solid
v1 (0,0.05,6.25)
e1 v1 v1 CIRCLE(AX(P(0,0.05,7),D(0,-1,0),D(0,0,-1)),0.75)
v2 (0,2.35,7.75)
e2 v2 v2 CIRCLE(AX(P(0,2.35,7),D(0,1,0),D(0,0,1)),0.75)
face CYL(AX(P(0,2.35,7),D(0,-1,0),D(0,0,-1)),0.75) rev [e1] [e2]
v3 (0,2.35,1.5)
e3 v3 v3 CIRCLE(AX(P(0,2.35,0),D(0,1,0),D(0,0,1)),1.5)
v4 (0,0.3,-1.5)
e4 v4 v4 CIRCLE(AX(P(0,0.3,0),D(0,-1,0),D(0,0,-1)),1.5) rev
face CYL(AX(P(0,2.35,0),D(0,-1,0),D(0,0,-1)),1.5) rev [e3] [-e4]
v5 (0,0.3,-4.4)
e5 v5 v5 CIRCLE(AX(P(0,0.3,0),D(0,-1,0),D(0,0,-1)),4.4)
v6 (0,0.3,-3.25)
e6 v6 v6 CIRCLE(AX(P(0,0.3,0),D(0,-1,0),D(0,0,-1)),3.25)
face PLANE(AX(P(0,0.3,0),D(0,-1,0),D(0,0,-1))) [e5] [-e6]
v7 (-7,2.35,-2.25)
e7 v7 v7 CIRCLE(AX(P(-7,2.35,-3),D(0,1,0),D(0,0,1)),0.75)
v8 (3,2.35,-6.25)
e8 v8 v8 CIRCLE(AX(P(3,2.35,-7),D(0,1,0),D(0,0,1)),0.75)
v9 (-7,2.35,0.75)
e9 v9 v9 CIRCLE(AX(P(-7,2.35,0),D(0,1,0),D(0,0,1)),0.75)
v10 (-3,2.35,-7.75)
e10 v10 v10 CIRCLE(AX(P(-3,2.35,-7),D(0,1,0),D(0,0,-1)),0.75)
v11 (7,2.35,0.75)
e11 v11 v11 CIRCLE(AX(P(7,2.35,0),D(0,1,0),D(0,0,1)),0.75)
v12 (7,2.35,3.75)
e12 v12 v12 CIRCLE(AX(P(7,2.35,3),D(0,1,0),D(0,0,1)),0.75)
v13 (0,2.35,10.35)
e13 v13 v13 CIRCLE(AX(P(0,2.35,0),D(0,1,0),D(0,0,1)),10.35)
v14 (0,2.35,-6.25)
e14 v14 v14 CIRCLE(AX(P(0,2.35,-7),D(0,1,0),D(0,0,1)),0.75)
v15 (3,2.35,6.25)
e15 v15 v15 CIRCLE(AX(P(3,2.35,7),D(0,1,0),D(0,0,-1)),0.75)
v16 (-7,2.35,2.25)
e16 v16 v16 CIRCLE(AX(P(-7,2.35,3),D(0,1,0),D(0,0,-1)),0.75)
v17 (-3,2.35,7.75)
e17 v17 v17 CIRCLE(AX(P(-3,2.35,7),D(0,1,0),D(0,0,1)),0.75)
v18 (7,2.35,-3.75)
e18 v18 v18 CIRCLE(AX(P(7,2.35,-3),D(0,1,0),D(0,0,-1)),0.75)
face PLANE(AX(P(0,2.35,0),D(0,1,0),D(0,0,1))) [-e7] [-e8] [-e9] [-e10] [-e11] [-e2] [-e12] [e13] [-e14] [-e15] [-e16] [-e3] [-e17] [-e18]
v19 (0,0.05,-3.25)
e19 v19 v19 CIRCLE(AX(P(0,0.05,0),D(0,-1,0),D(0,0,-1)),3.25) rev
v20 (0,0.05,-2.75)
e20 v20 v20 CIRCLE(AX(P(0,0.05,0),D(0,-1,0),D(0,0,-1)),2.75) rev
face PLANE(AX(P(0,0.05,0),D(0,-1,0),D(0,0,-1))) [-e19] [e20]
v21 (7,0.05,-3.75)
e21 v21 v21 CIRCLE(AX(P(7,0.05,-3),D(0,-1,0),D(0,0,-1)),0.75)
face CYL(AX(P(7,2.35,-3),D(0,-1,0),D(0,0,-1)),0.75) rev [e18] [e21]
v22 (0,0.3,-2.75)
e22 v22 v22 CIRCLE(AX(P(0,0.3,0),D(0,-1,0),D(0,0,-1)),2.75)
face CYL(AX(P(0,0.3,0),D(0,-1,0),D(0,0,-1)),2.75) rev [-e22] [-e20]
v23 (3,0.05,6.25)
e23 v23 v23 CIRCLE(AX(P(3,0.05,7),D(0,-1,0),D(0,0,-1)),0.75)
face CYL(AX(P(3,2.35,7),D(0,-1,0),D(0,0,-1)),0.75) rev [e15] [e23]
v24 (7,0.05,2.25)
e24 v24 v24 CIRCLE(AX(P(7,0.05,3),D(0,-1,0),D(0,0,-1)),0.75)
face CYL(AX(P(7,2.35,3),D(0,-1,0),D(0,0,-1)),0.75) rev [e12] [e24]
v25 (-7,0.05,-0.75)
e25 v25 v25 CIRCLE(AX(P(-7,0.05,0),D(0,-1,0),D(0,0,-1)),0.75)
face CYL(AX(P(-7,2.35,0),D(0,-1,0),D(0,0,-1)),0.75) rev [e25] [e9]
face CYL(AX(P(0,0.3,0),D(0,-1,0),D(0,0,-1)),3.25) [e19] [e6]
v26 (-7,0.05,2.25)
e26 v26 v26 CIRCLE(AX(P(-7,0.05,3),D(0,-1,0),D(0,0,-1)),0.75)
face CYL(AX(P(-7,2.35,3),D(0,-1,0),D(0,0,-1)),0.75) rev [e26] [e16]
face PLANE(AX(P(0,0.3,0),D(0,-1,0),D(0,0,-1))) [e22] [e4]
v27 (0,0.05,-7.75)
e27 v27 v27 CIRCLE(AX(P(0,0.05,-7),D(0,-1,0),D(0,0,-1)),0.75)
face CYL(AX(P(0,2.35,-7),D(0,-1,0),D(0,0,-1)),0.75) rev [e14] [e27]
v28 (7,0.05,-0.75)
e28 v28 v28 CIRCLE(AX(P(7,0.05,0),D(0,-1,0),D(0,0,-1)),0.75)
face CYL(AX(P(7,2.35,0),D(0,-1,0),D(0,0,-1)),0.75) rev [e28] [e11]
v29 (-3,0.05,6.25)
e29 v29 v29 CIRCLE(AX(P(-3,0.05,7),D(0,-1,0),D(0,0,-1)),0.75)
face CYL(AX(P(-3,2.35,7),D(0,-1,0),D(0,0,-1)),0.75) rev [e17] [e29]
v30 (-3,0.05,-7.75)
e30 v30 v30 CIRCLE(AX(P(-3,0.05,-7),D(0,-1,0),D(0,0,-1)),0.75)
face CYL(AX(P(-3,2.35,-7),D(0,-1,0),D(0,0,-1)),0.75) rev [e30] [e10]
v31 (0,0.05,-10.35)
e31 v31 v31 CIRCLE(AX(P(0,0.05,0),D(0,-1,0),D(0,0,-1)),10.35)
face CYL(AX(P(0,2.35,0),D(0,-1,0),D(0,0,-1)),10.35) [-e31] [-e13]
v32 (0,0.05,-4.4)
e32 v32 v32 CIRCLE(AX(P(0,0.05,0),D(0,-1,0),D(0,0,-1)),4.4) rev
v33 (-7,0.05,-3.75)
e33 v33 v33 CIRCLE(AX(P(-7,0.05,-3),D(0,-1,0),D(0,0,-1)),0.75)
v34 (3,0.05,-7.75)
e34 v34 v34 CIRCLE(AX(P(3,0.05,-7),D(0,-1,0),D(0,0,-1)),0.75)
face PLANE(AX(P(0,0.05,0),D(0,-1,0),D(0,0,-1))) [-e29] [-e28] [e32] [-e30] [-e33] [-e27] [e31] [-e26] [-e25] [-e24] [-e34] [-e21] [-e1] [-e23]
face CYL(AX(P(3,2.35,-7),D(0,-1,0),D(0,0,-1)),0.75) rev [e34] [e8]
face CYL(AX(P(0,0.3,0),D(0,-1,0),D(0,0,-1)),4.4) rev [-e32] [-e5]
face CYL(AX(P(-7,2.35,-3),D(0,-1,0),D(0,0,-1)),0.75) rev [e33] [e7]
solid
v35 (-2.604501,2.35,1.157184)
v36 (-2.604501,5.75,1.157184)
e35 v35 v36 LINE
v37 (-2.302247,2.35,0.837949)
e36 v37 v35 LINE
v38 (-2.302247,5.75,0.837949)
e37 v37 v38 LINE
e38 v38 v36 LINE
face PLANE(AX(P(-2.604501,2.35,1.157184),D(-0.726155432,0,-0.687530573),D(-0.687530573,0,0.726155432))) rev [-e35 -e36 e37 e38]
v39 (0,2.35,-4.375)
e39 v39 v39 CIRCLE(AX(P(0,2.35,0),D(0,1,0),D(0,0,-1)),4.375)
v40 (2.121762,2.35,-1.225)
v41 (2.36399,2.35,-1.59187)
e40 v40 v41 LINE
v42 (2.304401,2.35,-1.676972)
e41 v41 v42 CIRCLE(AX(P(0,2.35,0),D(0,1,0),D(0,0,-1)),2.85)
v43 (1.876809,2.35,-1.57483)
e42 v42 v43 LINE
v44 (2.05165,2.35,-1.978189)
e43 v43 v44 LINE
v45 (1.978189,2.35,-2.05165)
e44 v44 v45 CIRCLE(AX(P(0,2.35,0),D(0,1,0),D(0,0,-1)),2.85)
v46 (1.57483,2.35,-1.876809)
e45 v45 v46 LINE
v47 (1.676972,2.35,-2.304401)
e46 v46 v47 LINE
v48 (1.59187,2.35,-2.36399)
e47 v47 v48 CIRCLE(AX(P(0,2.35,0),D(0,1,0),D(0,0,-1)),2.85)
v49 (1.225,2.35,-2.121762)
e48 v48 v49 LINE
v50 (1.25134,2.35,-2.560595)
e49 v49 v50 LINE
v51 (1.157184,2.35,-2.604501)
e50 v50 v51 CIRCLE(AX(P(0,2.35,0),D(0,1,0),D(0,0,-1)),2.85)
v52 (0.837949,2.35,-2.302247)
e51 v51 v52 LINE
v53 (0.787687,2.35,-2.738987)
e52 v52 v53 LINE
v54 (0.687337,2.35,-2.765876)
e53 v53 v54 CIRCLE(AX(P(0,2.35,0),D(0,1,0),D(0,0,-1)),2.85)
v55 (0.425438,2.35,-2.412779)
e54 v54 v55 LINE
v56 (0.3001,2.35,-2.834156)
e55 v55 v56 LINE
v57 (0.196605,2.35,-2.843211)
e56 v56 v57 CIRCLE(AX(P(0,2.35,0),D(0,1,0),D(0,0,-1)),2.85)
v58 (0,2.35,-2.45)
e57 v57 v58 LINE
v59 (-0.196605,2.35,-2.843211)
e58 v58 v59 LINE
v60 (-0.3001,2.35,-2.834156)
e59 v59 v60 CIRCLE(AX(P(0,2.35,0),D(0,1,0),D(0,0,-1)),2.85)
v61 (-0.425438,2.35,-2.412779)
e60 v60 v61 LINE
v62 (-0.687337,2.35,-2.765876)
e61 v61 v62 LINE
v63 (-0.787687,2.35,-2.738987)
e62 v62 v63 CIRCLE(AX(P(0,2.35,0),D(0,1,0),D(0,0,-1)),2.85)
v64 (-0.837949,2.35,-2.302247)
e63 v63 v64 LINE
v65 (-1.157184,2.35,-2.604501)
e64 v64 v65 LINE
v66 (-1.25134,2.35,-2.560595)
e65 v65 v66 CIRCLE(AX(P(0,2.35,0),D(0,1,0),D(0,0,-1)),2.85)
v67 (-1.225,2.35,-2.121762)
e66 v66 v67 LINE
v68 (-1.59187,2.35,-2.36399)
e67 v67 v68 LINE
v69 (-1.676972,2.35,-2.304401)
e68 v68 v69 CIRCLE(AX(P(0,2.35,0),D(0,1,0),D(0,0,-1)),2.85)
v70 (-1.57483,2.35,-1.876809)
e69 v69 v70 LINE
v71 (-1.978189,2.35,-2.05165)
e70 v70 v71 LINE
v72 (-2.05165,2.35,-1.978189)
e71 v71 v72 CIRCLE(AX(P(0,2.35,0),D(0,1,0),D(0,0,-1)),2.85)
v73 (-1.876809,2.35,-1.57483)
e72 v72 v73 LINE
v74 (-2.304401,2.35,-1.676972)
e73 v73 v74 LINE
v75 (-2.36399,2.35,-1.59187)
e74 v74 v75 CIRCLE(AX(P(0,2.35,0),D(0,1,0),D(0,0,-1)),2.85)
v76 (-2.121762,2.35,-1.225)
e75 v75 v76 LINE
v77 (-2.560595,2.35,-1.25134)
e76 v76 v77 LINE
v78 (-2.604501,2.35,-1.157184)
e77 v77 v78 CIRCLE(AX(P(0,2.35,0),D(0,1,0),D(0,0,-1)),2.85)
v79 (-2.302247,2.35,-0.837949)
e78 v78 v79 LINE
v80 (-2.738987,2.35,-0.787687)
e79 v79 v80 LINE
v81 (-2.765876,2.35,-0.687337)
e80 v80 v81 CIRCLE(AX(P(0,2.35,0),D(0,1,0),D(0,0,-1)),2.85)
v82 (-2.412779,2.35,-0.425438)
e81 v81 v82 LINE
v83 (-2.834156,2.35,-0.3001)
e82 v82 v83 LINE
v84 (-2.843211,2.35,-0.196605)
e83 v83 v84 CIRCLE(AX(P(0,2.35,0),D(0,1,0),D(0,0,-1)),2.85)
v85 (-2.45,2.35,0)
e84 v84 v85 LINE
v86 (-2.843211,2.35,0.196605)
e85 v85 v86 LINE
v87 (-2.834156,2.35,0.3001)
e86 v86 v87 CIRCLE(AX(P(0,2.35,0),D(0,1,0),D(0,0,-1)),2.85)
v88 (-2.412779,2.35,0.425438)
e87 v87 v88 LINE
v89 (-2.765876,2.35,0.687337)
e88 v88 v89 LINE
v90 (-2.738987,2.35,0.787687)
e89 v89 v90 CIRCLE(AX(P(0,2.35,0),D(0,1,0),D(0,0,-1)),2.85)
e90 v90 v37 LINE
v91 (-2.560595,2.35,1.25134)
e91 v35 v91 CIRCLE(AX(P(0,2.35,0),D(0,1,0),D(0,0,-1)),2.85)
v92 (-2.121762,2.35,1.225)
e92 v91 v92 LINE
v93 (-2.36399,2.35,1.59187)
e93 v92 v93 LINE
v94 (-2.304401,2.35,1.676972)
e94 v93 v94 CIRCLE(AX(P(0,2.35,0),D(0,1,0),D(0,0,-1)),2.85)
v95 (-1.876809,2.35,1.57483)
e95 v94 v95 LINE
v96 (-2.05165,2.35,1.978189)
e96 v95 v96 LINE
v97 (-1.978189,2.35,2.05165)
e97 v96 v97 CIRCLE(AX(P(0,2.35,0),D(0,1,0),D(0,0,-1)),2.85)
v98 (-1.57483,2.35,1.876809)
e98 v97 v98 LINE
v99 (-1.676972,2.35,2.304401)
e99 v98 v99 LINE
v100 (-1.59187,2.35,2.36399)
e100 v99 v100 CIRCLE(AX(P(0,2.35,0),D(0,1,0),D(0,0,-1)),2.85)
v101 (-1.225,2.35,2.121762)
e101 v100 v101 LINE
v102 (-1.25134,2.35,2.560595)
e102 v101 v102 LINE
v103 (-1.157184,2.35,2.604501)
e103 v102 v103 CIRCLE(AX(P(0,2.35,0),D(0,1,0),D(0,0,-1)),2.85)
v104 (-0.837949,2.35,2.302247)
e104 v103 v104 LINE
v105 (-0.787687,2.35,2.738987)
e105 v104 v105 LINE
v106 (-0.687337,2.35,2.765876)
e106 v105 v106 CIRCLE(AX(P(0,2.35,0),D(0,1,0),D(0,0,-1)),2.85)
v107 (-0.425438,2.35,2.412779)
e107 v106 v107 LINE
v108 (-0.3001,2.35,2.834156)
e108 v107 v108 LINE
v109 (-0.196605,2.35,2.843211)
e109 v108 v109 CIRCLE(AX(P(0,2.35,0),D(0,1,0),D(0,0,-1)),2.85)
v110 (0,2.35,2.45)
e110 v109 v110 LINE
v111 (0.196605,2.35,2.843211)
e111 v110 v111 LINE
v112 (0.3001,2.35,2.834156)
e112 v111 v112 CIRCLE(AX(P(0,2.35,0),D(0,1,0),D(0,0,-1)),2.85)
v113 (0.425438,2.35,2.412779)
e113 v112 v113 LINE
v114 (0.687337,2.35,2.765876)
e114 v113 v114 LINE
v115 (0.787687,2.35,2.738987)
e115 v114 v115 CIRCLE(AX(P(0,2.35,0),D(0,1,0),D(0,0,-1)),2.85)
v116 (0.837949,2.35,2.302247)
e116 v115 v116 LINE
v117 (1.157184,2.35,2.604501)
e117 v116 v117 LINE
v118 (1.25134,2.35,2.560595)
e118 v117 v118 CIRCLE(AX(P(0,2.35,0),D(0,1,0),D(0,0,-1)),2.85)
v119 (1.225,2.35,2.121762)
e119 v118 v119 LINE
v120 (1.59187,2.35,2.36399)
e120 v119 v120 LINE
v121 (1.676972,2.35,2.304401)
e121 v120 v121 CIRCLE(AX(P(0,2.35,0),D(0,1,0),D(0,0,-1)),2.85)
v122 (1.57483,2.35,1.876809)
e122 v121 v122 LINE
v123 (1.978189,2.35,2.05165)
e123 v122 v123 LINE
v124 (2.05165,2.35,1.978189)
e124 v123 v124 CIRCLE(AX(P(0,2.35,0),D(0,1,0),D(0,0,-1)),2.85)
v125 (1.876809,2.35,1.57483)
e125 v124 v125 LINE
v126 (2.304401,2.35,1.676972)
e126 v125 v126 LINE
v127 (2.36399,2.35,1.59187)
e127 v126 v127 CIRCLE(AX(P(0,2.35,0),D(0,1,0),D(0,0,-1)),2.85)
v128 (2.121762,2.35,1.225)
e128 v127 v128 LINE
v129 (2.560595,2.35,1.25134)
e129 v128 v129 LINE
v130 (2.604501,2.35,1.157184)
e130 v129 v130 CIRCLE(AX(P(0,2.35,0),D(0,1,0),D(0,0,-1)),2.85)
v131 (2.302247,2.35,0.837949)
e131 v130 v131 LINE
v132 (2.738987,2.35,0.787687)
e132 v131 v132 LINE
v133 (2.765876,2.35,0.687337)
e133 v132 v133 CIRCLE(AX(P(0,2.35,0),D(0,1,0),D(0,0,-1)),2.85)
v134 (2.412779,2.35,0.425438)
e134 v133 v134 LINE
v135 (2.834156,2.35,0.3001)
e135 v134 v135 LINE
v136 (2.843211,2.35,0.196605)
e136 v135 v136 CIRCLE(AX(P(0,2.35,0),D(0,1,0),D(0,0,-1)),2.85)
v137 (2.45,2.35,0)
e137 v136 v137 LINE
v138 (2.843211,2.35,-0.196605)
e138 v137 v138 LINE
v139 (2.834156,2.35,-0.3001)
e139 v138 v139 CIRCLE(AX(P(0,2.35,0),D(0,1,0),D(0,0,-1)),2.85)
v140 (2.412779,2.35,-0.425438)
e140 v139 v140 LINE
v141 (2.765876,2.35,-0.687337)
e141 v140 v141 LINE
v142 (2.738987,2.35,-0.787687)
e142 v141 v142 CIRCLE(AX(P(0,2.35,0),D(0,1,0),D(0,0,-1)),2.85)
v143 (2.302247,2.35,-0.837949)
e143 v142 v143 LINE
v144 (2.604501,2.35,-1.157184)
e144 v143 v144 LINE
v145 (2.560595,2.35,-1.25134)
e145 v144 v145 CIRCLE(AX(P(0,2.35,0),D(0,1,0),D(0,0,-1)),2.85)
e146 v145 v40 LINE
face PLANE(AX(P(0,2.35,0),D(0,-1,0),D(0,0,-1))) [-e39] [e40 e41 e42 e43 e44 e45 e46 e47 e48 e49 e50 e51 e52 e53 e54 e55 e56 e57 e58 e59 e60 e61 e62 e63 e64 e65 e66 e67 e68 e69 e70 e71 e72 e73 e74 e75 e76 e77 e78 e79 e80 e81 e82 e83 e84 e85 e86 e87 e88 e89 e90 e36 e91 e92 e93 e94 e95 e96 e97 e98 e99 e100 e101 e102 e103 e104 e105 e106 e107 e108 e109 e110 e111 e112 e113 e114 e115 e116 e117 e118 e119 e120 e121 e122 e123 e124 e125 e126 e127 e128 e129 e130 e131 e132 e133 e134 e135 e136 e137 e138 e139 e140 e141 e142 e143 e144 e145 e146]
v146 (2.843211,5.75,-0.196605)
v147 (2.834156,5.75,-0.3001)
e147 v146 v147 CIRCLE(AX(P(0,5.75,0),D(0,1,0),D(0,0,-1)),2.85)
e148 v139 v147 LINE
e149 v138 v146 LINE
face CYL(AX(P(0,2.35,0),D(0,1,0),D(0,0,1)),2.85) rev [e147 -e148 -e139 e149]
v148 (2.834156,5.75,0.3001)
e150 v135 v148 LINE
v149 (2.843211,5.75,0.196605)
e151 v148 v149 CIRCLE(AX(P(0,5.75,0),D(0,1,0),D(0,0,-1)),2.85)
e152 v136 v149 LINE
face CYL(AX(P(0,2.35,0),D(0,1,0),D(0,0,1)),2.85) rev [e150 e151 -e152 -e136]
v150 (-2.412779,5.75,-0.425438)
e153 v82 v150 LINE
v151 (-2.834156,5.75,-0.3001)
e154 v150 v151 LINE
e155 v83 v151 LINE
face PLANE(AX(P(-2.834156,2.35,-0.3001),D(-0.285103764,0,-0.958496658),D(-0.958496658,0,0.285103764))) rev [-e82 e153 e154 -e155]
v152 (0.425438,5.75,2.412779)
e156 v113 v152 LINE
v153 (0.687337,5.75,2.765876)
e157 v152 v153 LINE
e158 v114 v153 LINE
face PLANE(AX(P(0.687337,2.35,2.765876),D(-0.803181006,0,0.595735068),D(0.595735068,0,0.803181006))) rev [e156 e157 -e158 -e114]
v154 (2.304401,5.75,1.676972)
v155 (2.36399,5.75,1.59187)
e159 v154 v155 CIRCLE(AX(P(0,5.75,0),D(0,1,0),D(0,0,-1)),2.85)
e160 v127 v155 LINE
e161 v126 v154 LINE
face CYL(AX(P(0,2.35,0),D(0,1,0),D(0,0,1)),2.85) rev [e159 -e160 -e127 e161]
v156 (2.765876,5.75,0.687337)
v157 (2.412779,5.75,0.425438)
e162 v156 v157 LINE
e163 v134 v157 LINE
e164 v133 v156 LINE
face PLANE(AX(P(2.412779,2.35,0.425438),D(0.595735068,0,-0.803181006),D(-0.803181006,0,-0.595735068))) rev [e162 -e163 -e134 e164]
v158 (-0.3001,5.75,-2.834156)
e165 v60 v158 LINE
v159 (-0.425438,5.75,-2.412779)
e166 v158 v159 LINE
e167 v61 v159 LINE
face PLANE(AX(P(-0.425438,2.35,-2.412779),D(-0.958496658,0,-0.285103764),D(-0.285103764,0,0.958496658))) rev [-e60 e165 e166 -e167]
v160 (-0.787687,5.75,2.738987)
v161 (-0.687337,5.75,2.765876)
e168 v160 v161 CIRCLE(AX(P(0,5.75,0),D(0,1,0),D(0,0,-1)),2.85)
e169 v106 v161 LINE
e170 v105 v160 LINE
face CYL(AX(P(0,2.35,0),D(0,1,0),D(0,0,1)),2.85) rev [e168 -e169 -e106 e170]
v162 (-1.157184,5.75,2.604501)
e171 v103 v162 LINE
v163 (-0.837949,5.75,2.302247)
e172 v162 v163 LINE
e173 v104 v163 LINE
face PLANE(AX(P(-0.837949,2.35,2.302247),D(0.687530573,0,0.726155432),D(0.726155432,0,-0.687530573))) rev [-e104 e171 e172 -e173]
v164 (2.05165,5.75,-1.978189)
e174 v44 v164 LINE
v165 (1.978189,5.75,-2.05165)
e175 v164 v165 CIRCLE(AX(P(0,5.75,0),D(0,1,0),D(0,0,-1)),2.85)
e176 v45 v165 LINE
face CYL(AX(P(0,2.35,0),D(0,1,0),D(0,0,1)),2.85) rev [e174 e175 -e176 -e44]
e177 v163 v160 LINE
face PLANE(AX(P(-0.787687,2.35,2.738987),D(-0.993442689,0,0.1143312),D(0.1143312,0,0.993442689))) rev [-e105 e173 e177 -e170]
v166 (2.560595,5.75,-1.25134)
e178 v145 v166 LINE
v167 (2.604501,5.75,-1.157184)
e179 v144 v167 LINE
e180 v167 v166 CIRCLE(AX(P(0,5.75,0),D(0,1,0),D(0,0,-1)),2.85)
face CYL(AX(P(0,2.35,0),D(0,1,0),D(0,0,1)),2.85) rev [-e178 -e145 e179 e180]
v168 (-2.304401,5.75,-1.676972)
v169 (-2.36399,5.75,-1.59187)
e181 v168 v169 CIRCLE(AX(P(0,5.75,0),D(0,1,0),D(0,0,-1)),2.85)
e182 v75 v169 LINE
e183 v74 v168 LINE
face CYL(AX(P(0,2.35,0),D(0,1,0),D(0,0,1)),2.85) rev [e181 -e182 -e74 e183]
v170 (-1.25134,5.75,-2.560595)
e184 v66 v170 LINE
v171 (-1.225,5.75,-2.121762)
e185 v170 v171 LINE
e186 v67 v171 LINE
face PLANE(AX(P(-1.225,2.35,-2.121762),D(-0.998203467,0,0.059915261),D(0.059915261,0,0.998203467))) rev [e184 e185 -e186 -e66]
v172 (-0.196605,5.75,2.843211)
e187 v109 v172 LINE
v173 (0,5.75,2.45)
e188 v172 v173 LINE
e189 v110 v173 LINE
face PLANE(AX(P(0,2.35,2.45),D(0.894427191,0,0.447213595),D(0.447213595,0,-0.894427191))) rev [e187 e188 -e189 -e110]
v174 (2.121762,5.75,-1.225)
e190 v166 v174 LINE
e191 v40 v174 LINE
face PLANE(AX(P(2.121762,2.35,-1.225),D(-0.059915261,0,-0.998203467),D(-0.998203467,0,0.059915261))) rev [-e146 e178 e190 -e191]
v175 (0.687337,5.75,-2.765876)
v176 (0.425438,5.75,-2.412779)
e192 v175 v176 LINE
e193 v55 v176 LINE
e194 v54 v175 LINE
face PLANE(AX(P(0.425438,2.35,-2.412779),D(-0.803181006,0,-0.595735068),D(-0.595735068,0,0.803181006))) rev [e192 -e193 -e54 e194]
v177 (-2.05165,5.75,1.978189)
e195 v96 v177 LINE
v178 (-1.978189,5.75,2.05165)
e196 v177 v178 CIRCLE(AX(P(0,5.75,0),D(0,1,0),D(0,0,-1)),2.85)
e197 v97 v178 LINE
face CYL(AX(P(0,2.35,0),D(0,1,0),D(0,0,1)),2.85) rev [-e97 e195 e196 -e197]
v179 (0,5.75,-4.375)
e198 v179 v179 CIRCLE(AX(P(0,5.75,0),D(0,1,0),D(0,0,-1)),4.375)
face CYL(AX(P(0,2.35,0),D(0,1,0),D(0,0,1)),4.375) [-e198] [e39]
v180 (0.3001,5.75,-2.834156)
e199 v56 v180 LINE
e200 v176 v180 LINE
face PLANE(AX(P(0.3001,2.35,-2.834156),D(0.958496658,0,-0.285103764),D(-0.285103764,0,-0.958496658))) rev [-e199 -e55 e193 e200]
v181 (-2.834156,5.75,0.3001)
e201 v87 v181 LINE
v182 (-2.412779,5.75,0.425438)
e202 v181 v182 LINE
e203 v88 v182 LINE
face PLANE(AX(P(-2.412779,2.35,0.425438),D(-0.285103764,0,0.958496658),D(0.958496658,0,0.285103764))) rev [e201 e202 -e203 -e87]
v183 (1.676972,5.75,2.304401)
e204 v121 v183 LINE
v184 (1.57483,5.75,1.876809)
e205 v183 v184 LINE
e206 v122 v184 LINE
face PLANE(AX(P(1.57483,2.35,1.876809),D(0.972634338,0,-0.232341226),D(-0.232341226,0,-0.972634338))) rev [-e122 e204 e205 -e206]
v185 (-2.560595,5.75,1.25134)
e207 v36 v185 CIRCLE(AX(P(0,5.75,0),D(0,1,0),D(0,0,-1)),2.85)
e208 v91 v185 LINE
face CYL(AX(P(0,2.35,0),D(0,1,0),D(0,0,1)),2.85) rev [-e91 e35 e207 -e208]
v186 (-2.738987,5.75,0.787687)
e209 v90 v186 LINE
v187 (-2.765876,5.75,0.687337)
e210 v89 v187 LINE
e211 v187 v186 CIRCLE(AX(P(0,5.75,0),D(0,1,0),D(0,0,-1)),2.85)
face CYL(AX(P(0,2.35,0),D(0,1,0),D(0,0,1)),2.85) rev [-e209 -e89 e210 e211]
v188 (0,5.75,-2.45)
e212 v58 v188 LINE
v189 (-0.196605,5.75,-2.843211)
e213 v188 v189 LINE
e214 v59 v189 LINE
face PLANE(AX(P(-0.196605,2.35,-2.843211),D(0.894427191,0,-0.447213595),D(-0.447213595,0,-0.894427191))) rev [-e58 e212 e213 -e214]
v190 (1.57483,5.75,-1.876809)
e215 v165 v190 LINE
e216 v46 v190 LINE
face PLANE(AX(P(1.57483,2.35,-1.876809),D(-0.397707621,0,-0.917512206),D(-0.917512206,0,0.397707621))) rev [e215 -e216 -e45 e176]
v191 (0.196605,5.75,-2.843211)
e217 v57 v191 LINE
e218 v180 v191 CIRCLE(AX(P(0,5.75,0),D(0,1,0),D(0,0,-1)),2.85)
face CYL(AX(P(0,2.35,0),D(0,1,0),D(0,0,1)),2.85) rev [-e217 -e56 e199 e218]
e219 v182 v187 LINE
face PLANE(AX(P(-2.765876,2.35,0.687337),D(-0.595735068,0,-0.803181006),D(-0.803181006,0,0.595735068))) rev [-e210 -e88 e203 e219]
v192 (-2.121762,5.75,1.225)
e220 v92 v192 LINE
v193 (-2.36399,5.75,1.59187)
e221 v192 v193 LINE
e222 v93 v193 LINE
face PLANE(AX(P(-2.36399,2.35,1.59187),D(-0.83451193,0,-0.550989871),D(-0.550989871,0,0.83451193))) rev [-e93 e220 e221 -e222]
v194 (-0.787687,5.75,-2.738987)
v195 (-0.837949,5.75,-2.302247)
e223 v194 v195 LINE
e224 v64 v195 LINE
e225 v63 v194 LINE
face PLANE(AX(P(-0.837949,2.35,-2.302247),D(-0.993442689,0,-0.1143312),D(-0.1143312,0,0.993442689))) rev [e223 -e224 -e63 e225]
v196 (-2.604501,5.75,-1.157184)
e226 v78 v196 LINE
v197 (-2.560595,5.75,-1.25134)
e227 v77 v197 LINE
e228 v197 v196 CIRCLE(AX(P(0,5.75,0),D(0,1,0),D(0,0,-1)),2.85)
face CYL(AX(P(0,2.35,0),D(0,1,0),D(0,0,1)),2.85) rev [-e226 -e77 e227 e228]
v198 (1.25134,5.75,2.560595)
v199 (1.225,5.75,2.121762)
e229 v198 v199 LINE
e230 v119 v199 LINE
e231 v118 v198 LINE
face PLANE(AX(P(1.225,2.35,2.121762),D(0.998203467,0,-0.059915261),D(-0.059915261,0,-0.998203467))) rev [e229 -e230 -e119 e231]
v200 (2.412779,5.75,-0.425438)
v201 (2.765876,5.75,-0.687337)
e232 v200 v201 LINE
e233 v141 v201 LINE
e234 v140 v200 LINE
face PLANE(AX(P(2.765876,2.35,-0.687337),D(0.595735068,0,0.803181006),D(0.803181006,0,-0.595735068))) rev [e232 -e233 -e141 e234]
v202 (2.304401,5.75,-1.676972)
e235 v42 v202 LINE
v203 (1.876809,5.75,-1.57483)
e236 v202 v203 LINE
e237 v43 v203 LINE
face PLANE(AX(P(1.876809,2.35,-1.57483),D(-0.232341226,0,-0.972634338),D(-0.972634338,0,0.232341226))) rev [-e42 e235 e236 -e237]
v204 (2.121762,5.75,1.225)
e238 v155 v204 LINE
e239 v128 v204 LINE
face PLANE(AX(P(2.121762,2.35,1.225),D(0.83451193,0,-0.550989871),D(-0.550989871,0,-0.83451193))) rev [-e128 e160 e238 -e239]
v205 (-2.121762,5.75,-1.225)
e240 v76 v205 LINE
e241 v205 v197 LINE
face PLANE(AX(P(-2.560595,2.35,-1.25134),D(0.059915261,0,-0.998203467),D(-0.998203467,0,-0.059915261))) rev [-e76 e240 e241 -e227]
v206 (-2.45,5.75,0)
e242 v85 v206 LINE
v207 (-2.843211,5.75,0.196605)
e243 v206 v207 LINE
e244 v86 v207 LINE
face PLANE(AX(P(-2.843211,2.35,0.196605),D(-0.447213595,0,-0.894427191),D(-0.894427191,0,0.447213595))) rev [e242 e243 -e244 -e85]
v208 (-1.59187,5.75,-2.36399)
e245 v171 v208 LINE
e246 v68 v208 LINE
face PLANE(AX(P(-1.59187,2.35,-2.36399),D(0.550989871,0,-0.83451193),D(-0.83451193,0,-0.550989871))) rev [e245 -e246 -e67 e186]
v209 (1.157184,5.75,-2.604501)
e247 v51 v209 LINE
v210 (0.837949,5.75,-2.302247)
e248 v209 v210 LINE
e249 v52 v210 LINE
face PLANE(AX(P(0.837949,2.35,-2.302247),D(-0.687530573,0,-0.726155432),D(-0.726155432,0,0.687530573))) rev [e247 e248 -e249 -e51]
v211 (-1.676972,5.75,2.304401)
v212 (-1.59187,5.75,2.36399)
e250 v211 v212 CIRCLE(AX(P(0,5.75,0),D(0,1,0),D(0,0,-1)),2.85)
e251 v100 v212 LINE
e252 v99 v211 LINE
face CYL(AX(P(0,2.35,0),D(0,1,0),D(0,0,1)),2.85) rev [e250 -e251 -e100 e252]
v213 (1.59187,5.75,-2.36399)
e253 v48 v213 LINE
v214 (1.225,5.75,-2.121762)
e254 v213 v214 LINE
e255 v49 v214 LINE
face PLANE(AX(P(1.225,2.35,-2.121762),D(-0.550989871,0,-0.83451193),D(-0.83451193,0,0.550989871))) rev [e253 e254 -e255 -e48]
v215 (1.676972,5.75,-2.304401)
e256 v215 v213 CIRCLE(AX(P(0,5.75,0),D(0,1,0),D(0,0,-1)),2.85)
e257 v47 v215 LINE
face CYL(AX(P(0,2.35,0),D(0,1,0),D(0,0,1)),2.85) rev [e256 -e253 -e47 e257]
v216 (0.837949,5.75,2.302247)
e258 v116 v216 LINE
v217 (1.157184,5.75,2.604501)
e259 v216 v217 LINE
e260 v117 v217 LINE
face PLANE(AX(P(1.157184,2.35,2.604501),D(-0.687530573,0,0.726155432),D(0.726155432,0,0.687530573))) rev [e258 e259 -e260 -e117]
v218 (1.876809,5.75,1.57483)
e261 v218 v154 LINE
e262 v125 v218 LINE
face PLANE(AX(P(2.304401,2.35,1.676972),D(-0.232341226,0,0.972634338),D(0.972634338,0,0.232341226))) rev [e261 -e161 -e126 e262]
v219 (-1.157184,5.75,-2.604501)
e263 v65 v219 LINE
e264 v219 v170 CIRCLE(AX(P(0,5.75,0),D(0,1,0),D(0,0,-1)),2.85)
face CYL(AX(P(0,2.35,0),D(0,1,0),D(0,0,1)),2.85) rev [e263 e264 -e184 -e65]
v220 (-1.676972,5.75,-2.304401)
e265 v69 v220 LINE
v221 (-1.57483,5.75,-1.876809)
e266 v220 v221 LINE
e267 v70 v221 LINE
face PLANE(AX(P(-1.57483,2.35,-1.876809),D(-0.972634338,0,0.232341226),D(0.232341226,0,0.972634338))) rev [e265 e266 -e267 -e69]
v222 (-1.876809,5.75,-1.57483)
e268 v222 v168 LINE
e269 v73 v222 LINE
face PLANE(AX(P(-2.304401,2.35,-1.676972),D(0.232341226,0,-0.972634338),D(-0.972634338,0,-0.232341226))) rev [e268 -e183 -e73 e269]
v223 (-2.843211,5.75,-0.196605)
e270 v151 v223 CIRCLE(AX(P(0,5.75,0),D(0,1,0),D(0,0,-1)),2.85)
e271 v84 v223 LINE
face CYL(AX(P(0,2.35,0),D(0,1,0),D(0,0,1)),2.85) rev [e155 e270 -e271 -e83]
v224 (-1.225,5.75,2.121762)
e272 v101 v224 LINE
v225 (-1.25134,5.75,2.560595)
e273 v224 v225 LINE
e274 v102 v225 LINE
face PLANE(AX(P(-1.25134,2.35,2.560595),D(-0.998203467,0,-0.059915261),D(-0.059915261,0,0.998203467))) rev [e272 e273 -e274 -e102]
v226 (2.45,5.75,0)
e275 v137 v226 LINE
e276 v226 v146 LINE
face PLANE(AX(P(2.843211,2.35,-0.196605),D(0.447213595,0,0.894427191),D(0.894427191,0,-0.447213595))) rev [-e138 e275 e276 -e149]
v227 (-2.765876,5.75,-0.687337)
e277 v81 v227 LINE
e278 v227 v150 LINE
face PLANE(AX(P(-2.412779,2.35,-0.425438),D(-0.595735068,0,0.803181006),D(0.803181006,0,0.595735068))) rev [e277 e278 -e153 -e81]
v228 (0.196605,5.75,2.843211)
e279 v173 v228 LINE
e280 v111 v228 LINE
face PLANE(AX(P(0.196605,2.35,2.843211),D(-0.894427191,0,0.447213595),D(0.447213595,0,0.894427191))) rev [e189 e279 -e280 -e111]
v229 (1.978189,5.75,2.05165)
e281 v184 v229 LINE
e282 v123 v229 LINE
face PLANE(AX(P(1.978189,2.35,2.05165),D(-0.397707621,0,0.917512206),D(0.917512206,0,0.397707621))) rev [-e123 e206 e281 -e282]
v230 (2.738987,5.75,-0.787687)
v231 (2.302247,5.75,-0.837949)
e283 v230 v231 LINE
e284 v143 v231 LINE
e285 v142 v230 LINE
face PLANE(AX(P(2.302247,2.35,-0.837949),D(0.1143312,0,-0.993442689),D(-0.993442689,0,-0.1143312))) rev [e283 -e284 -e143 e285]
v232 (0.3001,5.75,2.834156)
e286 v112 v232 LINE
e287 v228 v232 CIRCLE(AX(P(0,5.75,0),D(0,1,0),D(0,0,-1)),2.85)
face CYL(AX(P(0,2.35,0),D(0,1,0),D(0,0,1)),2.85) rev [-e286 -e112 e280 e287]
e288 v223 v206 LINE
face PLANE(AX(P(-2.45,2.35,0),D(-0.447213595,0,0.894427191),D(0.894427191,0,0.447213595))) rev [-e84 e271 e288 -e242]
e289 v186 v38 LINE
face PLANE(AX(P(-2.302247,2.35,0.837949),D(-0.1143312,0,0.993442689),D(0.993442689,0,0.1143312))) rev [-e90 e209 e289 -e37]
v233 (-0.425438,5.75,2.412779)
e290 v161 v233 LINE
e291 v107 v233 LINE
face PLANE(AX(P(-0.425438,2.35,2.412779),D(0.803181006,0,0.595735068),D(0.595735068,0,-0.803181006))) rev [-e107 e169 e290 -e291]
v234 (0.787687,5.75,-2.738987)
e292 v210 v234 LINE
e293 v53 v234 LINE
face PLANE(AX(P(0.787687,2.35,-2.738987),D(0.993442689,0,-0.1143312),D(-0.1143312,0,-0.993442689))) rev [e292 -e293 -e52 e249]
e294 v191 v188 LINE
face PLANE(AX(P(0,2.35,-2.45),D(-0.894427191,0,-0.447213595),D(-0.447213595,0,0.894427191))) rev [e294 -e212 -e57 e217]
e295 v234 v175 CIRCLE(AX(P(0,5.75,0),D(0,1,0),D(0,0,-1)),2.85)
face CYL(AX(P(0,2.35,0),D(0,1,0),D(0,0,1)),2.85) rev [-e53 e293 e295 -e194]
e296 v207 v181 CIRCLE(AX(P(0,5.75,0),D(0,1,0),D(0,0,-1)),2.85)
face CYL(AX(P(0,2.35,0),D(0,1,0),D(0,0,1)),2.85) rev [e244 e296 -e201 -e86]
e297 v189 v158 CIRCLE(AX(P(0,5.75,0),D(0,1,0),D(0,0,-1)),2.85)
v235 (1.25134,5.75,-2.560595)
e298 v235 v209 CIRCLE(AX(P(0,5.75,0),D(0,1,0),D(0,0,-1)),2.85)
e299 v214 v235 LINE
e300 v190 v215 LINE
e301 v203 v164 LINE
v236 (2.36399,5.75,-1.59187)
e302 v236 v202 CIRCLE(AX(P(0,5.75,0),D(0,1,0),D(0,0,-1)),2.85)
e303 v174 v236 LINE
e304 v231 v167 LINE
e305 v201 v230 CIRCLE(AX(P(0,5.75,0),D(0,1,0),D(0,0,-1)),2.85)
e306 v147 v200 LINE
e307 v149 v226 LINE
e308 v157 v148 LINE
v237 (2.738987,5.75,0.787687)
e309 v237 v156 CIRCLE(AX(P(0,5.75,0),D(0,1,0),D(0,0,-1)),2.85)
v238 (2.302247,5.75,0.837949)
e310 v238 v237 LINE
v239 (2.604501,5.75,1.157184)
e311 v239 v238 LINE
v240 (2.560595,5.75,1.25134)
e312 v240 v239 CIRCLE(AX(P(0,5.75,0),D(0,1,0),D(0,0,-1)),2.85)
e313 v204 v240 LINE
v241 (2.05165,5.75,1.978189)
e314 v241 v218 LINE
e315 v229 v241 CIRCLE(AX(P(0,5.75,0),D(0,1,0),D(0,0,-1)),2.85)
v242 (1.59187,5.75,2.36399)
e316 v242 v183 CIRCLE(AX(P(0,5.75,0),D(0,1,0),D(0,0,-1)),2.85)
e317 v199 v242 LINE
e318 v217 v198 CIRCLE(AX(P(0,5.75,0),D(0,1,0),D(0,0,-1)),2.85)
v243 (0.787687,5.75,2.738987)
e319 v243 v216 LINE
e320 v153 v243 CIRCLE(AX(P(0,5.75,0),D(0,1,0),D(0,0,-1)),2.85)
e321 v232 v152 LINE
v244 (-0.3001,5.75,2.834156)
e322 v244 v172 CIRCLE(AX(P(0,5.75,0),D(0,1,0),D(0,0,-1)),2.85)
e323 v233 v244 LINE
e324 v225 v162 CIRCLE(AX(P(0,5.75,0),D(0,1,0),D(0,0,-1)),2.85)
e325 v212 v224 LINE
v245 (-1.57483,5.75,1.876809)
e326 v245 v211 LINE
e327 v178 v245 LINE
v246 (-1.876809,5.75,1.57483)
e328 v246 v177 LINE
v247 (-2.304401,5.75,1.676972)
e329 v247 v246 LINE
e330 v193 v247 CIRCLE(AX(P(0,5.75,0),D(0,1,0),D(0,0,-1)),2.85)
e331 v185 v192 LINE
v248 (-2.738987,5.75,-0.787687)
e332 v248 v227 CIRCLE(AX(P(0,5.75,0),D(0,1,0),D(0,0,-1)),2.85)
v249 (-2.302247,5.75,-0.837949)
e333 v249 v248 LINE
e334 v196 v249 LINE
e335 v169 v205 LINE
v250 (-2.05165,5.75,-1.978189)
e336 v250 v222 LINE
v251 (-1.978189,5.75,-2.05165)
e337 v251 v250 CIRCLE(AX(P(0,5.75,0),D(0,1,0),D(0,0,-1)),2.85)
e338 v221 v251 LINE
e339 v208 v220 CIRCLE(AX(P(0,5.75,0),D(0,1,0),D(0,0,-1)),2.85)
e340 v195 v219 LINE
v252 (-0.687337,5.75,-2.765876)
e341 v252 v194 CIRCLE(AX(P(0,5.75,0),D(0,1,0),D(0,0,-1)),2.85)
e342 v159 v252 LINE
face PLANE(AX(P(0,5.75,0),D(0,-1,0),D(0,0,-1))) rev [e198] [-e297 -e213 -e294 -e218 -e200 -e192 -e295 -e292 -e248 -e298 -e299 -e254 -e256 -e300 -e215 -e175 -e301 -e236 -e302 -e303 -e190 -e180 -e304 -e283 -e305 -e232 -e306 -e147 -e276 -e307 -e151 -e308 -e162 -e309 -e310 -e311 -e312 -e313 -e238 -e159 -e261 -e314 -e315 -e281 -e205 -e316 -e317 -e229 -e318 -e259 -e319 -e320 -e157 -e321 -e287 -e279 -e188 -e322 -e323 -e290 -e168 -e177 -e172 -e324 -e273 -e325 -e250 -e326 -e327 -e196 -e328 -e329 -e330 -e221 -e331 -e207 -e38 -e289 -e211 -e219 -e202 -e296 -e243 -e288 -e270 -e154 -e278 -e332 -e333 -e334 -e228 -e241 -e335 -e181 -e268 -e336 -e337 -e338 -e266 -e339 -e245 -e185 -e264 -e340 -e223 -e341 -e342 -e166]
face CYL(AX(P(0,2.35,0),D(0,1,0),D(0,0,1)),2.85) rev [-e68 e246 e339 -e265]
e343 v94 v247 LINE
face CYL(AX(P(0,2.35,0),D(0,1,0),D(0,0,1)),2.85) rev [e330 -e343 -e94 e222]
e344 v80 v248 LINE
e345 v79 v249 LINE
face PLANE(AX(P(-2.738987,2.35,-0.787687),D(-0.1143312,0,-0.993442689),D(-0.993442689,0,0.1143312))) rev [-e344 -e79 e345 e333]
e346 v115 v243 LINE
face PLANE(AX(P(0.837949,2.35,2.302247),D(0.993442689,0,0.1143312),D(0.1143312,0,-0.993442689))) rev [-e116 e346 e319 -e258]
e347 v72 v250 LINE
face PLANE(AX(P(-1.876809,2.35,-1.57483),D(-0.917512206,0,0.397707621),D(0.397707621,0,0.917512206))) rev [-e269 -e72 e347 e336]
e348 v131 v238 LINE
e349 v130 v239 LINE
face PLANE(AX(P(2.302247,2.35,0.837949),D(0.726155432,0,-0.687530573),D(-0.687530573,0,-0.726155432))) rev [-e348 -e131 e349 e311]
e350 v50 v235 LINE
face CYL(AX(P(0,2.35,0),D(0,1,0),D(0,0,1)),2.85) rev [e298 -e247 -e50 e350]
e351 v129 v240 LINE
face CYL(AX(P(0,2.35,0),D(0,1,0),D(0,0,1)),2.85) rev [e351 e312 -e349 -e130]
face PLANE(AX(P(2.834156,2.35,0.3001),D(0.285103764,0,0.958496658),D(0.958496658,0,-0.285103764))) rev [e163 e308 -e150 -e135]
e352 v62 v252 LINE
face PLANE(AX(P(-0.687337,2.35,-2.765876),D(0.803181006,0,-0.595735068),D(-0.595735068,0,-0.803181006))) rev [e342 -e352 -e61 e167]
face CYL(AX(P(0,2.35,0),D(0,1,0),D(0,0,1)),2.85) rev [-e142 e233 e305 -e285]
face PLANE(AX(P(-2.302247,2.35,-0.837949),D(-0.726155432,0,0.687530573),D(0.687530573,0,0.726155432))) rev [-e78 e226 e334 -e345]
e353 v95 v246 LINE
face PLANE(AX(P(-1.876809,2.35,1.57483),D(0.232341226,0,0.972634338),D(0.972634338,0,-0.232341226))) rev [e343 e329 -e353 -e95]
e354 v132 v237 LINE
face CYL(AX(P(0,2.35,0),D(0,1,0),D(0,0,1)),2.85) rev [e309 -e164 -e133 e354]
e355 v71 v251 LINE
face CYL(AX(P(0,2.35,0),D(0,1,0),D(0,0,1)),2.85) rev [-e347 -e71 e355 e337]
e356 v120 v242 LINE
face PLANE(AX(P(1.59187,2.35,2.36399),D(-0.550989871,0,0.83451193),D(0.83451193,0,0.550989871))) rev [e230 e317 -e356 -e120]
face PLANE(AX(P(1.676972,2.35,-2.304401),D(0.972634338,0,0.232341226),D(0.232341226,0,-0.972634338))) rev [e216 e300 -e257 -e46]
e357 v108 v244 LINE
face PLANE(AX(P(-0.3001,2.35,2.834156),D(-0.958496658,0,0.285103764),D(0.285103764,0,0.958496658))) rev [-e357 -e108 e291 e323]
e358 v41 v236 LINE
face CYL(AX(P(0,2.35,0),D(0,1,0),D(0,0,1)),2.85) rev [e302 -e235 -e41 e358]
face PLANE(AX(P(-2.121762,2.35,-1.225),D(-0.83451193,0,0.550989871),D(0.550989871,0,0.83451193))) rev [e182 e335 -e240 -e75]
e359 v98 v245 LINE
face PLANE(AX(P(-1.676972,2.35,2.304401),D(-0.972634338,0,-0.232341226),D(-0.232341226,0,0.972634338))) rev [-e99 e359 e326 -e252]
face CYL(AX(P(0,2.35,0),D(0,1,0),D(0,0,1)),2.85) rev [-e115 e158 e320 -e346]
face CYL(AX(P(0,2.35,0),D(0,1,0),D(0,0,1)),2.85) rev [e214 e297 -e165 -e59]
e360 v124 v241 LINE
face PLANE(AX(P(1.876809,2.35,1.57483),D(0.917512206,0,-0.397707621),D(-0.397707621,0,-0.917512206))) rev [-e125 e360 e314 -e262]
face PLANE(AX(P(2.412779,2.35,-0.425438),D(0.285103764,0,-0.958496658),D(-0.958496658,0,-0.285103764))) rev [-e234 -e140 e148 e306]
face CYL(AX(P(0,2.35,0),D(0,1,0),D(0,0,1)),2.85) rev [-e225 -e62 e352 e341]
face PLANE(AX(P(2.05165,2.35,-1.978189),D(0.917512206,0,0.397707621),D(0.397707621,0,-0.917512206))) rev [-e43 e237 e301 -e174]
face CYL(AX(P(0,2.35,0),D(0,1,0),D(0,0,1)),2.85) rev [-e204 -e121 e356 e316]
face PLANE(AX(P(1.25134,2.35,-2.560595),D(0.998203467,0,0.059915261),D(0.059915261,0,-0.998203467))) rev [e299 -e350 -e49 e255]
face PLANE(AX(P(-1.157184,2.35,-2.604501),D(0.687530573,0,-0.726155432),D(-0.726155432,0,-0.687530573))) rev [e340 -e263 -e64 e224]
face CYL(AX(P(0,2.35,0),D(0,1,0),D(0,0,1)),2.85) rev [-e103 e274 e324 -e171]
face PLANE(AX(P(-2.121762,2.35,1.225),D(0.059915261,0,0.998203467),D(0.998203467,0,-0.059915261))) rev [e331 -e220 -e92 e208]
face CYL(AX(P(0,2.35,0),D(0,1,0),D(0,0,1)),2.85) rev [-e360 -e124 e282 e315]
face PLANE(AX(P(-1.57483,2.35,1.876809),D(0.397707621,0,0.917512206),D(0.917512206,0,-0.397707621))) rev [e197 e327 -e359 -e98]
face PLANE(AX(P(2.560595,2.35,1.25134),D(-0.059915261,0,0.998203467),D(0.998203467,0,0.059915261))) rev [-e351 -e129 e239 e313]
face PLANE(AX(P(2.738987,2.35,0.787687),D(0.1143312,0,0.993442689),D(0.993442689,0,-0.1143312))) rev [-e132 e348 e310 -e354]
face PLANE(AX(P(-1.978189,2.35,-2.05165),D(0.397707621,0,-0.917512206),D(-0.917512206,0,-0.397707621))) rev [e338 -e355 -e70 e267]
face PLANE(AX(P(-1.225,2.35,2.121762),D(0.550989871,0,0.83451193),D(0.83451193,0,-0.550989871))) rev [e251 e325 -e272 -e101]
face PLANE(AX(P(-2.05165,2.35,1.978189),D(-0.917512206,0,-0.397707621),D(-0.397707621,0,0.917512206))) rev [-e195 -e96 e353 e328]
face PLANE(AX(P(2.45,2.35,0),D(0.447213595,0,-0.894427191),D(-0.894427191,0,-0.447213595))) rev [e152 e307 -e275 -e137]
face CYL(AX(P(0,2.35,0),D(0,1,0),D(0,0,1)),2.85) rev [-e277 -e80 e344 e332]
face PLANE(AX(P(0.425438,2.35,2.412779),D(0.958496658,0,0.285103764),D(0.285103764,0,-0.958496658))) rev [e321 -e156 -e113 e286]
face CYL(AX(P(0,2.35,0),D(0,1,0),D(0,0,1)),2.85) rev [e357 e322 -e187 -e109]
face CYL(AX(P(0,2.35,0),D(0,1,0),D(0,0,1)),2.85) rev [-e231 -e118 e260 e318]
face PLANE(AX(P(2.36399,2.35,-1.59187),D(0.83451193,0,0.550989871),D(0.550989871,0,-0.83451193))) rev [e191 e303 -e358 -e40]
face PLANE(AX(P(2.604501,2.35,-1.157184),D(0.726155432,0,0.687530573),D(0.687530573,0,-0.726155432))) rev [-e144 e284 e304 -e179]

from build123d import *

# Parameters (mm, degrees)
SKETCH1_R                  = 4.375
BOSS_EXTRUDE1_DEPTH        = 3.4
CUT_EXTRUDE1_START         = -2.35
CUT_EXTRUDE1_OUTLINE_R     = 10.35
CUT_EXTRUDE1_OUTLINE_R_2   = 0.75
CUT_EXTRUDE1_OUTLINE_R_3   = 1.5
CUT_EXTRUDE1_DEPTH         = 2.05
CUT_EXTRUDE1_START_2       = -0.3
CUT_EXTRUDE1_2_OUTLINE_R   = 10.35
CUT_EXTRUDE1_2_OUTLINE_R_2 = 0.75
CUT_EXTRUDE1_2_OUTLINE_R_3 = 4.4
CUT_EXTRUDE1_2_OUTLINE_R_4 = 3.25
CUT_EXTRUDE1_2_OUTLINE_R_5 = 2.75
CUT_EXTRUDE1_2_DEPTH       = 0.25


# Read off the part's stored shape, not the designer's step: Cut-Extrude1
with BuildPart() as part:
    # Sketch1 → Boss-Extrude1 (new body)
    with BuildSketch(Plane(origin=(0, 5.75, 0), x_dir=(1, 0, 0), z_dir=(0, 1, 0))):
        with Locations(Location((0, 0, 0), (0, 0, 90))):
            Circle(SKETCH1_R)
        with BuildLine():
            Line((0, -2.45), (-0.196605286, -2.843210573))
            ThreePointArc((-0.196605286, -2.843210573), (-0.248393867, -2.83915489), (-0.300099924, -2.834155965))
            Line((-0.300099924, -2.834155965), (-0.425438035, -2.412778995))
            Line((-0.425438035, -2.412778995), (-0.687336745, -2.765875666))
            ThreePointArc((-0.687336745, -2.765875666), (-0.737634279, -2.752888605), (-0.787686751, -2.738986963))
            Line((-0.787686751, -2.738986963), (-0.837949351, -2.302246921))
            Line((-0.837949351, -2.302246921), (-1.157183824, -2.604501026))
            ThreePointArc((-1.157183824, -2.604501026), (-1.204462046, -2.582977193), (-1.251340114, -2.560595228))
            Line((-1.251340114, -2.560595228), (-1.225, -2.121762239))
            Line((-1.225, -2.121762239), (-1.591870459, -2.363989941))
            ThreePointArc((-1.591870459, -2.363989941), (-1.634692844, -2.334583326), (-1.676972141, -2.304401102))
            Line((-1.676972141, -2.304401102), (-1.574829644, -1.876808886))
            Line((-1.574829644, -1.876808886), (-1.978188915, -2.051650218))
            ThreePointArc((-1.978188915, -2.051650218), (-2.015254326, -2.015254326), (-2.051650218, -1.978188915))
            Line((-2.051650218, -1.978188915), (-1.876808886, -1.574829644))
            Line((-1.876808886, -1.574829644), (-2.304401102, -1.676972141))
            ThreePointArc((-2.304401102, -1.676972141), (-2.334583326, -1.634692844), (-2.363989941, -1.591870459))
            Line((-2.363989941, -1.591870459), (-2.121762239, -1.225))
            Line((-2.121762239, -1.225), (-2.560595228, -1.251340114))
            ThreePointArc((-2.560595228, -1.251340114), (-2.582977193, -1.204462046), (-2.604501026, -1.157183824))
            Line((-2.604501026, -1.157183824), (-2.302246921, -0.837949351))
            Line((-2.302246921, -0.837949351), (-2.738986963, -0.787686751))
            ThreePointArc((-2.738986963, -0.787686751), (-2.752888605, -0.737634279), (-2.765875666, -0.687336745))
            Line((-2.765875666, -0.687336745), (-2.412778995, -0.425438035))
            Line((-2.412778995, -0.425438035), (-2.834155965, -0.300099924))
            ThreePointArc((-2.834155965, -0.300099924), (-2.83915489, -0.248393867), (-2.843210573, -0.196605286))
            Line((-2.843210573, -0.196605286), (-2.45, 0))
            Line((-2.45, 0), (-2.843210573, 0.196605286))
            ThreePointArc((-2.843210573, 0.196605286), (-2.83915489, 0.248393867), (-2.834155965, 0.300099924))
            Line((-2.834155965, 0.300099924), (-2.412778995, 0.425438035))
            Line((-2.412778995, 0.425438035), (-2.765875666, 0.687336745))
            ThreePointArc((-2.765875666, 0.687336745), (-2.752888605, 0.737634279), (-2.738986963, 0.787686751))
            Line((-2.738986963, 0.787686751), (-2.302246921, 0.837949351))
            Line((-2.302246921, 0.837949351), (-2.604501026, 1.157183824))
            ThreePointArc((-2.604501026, 1.157183824), (-2.582977193, 1.204462046), (-2.560595228, 1.251340114))
            Line((-2.560595228, 1.251340114), (-2.121762239, 1.225))
            Line((-2.121762239, 1.225), (-2.363989941, 1.591870459))
            ThreePointArc((-2.363989941, 1.591870459), (-2.334583326, 1.634692844), (-2.304401102, 1.676972141))
            Line((-2.304401102, 1.676972141), (-1.876808886, 1.574829644))
            Line((-1.876808886, 1.574829644), (-2.051650218, 1.978188915))
            ThreePointArc((-2.051650218, 1.978188915), (-2.015254326, 2.015254326), (-1.978188915, 2.051650218))
            Line((-1.978188915, 2.051650218), (-1.574829644, 1.876808886))
            Line((-1.574829644, 1.876808886), (-1.676972141, 2.304401102))
            ThreePointArc((-1.676972141, 2.304401102), (-1.634692844, 2.334583326), (-1.591870459, 2.363989941))
            Line((-1.591870459, 2.363989941), (-1.225, 2.121762239))
            Line((-1.225, 2.121762239), (-1.251340114, 2.560595228))
            ThreePointArc((-1.251340114, 2.560595228), (-1.204462046, 2.582977193), (-1.157183824, 2.604501026))
            Line((-1.157183824, 2.604501026), (-0.837949351, 2.302246921))
            Line((-0.837949351, 2.302246921), (-0.787686751, 2.738986963))
            ThreePointArc((-0.787686751, 2.738986963), (-0.737634279, 2.752888605), (-0.687336745, 2.765875666))
            Line((-0.687336745, 2.765875666), (-0.425438035, 2.412778995))
            Line((-0.425438035, 2.412778995), (-0.300099924, 2.834155965))
            ThreePointArc((-0.300099924, 2.834155965), (-0.248393867, 2.83915489), (-0.196605286, 2.843210573))
            Line((-0.196605286, 2.843210573), (0, 2.45))
            Line((0, 2.45), (0.196605286, 2.843210573))
            ThreePointArc((0.196605286, 2.843210573), (0.248393867, 2.83915489), (0.300099924, 2.834155965))
            Line((0.300099924, 2.834155965), (0.425438035, 2.412778995))
            Line((0.425438035, 2.412778995), (0.687336745, 2.765875666))
            ThreePointArc((0.687336745, 2.765875666), (0.737634279, 2.752888605), (0.787686751, 2.738986963))
            Line((0.787686751, 2.738986963), (0.837949351, 2.302246921))
            Line((0.837949351, 2.302246921), (1.157183824, 2.604501026))
            ThreePointArc((1.157183824, 2.604501026), (1.204462046, 2.582977193), (1.251340114, 2.560595228))
            Line((1.251340114, 2.560595228), (1.225, 2.121762239))
            Line((1.225, 2.121762239), (1.591870459, 2.363989941))
            ThreePointArc((1.591870459, 2.363989941), (1.634692844, 2.334583326), (1.676972141, 2.304401102))
            Line((1.676972141, 2.304401102), (1.574829644, 1.876808886))
            Line((1.574829644, 1.876808886), (1.978188915, 2.051650218))
            ThreePointArc((1.978188915, 2.051650218), (2.015254326, 2.015254326), (2.051650218, 1.978188915))
            Line((2.051650218, 1.978188915), (1.876808886, 1.574829644))
            Line((1.876808886, 1.574829644), (2.304401102, 1.676972141))
            ThreePointArc((2.304401102, 1.676972141), (2.334583326, 1.634692844), (2.363989941, 1.591870459))
            Line((2.363989941, 1.591870459), (2.121762239, 1.225))
            Line((2.121762239, 1.225), (2.560595228, 1.251340114))
            ThreePointArc((2.560595228, 1.251340114), (2.582977193, 1.204462046), (2.604501026, 1.157183824))
            Line((2.604501026, 1.157183824), (2.302246921, 0.837949351))
            Line((2.302246921, 0.837949351), (2.738986963, 0.787686751))
            ThreePointArc((2.738986963, 0.787686751), (2.752888605, 0.737634279), (2.765875666, 0.687336745))
            Line((2.765875666, 0.687336745), (2.412778995, 0.425438035))
            Line((2.412778995, 0.425438035), (2.834155965, 0.300099924))
            ThreePointArc((2.834155965, 0.300099924), (2.83915489, 0.248393867), (2.843210573, 0.196605286))
            Line((2.843210573, 0.196605286), (2.45, 0))
            Line((2.45, 0), (2.843210573, -0.196605286))
            ThreePointArc((2.843210573, -0.196605286), (2.83915489, -0.248393867), (2.834155965, -0.300099924))
            Line((2.834155965, -0.300099924), (2.412778995, -0.425438035))
            Line((2.412778995, -0.425438035), (2.765875666, -0.687336745))
            ThreePointArc((2.765875666, -0.687336745), (2.752888605, -0.737634279), (2.738986963, -0.787686751))
            Line((2.738986963, -0.787686751), (2.302246921, -0.837949351))
            Line((2.302246921, -0.837949351), (2.604501026, -1.157183824))
            ThreePointArc((2.604501026, -1.157183824), (2.582977193, -1.204462046), (2.560595228, -1.251340114))
            Line((2.560595228, -1.251340114), (2.121762239, -1.225))
            Line((2.121762239, -1.225), (2.363989941, -1.591870459))
            ThreePointArc((2.363989941, -1.591870459), (2.334583326, -1.634692844), (2.304401102, -1.676972141))
            Line((2.304401102, -1.676972141), (1.876808886, -1.574829644))
            Line((1.876808886, -1.574829644), (2.051650218, -1.978188915))
            ThreePointArc((2.051650218, -1.978188915), (2.015254326, -2.015254326), (1.978188915, -2.051650218))
            Line((1.978188915, -2.051650218), (1.574829644, -1.876808886))
            Line((1.574829644, -1.876808886), (1.676972141, -2.304401102))
            ThreePointArc((1.676972141, -2.304401102), (1.634692844, -2.334583326), (1.591870459, -2.363989941))
            Line((1.591870459, -2.363989941), (1.225, -2.121762239))
            Line((1.225, -2.121762239), (1.251340114, -2.560595228))
            ThreePointArc((1.251340114, -2.560595228), (1.204462046, -2.582977193), (1.157183824, -2.604501026))
            Line((1.157183824, -2.604501026), (0.837949351, -2.302246921))
            Line((0.837949351, -2.302246921), (0.787686751, -2.738986963))
            ThreePointArc((0.787686751, -2.738986963), (0.737634279, -2.752888605), (0.687336745, -2.765875666))
            Line((0.687336745, -2.765875666), (0.425438035, -2.412778995))
            Line((0.425438035, -2.412778995), (0.300099924, -2.834155965))
            ThreePointArc((0.300099924, -2.834155965), (0.248393867, -2.83915489), (0.196605286, -2.843210573))
            Line((0.196605286, -2.843210573), (0, -2.45))
        make_face(mode=Mode.SUBTRACT)
    extrude(amount=-BOSS_EXTRUDE1_DEPTH)


with BuildPart() as body_2:
    # Cut-Extrude1 outline → Cut-Extrude1 (new body)
    with BuildSketch(Plane.XZ.offset(CUT_EXTRUDE1_START)):
        Circle(CUT_EXTRUDE1_OUTLINE_R)
        with Locations((-3, -7)):
            Circle(CUT_EXTRUDE1_OUTLINE_R_2, mode=Mode.SUBTRACT)
        with Locations((-7, -3)):
            Circle(CUT_EXTRUDE1_OUTLINE_R_2, mode=Mode.SUBTRACT)
        with Locations((0, -7)):
            Circle(CUT_EXTRUDE1_OUTLINE_R_2, mode=Mode.SUBTRACT)
        with Locations((3, -7)):
            Circle(CUT_EXTRUDE1_OUTLINE_R_2, mode=Mode.SUBTRACT)
        with Locations((7, -3)):
            Circle(CUT_EXTRUDE1_OUTLINE_R_2, mode=Mode.SUBTRACT)
        with Locations((-7, 0)):
            Circle(CUT_EXTRUDE1_OUTLINE_R_2, mode=Mode.SUBTRACT)
        with Locations((-7, 3)):
            Circle(CUT_EXTRUDE1_OUTLINE_R_2, mode=Mode.SUBTRACT)
        with Locations((-3, 7)):
            Circle(CUT_EXTRUDE1_OUTLINE_R_2, mode=Mode.SUBTRACT)
        with Locations((7, 0)):
            Circle(CUT_EXTRUDE1_OUTLINE_R_2, mode=Mode.SUBTRACT)
        with Locations((7, 3)):
            Circle(CUT_EXTRUDE1_OUTLINE_R_2, mode=Mode.SUBTRACT)
        with Locations((0, 7)):
            Circle(CUT_EXTRUDE1_OUTLINE_R_2, mode=Mode.SUBTRACT)
        with Locations((3, 7)):
            Circle(CUT_EXTRUDE1_OUTLINE_R_2, mode=Mode.SUBTRACT)
        Circle(CUT_EXTRUDE1_OUTLINE_R_3, mode=Mode.SUBTRACT)
    extrude(amount=CUT_EXTRUDE1_DEPTH)

    # Cut-Extrude1 2 outline → Cut-Extrude1 2 (add)
    # profile 1 of 2: a face of its own
    with BuildSketch(Plane.XZ.offset(CUT_EXTRUDE1_START_2)):
        Circle(CUT_EXTRUDE1_2_OUTLINE_R)
        with Locations((-3, -7)):
            Circle(CUT_EXTRUDE1_2_OUTLINE_R_2, mode=Mode.SUBTRACT)
        with Locations((-7, -3)):
            Circle(CUT_EXTRUDE1_2_OUTLINE_R_2, mode=Mode.SUBTRACT)
        with Locations((0, -7)):
            Circle(CUT_EXTRUDE1_2_OUTLINE_R_2, mode=Mode.SUBTRACT)
        with Locations((3, -7)):
            Circle(CUT_EXTRUDE1_2_OUTLINE_R_2, mode=Mode.SUBTRACT)
        with Locations((7, -3)):
            Circle(CUT_EXTRUDE1_2_OUTLINE_R_2, mode=Mode.SUBTRACT)
        with Locations((-7, 0)):
            Circle(CUT_EXTRUDE1_2_OUTLINE_R_2, mode=Mode.SUBTRACT)
        with Locations((-7, 3)):
            Circle(CUT_EXTRUDE1_2_OUTLINE_R_2, mode=Mode.SUBTRACT)
        with Locations((-3, 7)):
            Circle(CUT_EXTRUDE1_2_OUTLINE_R_2, mode=Mode.SUBTRACT)
        Circle(CUT_EXTRUDE1_2_OUTLINE_R_3, mode=Mode.SUBTRACT)
        with Locations((7, 0)):
            Circle(CUT_EXTRUDE1_2_OUTLINE_R_2, mode=Mode.SUBTRACT)
        with Locations((7, 3)):
            Circle(CUT_EXTRUDE1_2_OUTLINE_R_2, mode=Mode.SUBTRACT)
        with Locations((0, 7)):
            Circle(CUT_EXTRUDE1_2_OUTLINE_R_2, mode=Mode.SUBTRACT)
        with Locations((3, 7)):
            Circle(CUT_EXTRUDE1_2_OUTLINE_R_2, mode=Mode.SUBTRACT)
    # profile 2 of 2: a face of its own
    with BuildSketch(Plane.XZ.offset(CUT_EXTRUDE1_START_2)):
        Circle(CUT_EXTRUDE1_2_OUTLINE_R_4)
        Circle(CUT_EXTRUDE1_2_OUTLINE_R_5, mode=Mode.SUBTRACT)
    extrude(amount=CUT_EXTRUDE1_2_DEPTH)


solid = Compound([part.part, body_2.part])
